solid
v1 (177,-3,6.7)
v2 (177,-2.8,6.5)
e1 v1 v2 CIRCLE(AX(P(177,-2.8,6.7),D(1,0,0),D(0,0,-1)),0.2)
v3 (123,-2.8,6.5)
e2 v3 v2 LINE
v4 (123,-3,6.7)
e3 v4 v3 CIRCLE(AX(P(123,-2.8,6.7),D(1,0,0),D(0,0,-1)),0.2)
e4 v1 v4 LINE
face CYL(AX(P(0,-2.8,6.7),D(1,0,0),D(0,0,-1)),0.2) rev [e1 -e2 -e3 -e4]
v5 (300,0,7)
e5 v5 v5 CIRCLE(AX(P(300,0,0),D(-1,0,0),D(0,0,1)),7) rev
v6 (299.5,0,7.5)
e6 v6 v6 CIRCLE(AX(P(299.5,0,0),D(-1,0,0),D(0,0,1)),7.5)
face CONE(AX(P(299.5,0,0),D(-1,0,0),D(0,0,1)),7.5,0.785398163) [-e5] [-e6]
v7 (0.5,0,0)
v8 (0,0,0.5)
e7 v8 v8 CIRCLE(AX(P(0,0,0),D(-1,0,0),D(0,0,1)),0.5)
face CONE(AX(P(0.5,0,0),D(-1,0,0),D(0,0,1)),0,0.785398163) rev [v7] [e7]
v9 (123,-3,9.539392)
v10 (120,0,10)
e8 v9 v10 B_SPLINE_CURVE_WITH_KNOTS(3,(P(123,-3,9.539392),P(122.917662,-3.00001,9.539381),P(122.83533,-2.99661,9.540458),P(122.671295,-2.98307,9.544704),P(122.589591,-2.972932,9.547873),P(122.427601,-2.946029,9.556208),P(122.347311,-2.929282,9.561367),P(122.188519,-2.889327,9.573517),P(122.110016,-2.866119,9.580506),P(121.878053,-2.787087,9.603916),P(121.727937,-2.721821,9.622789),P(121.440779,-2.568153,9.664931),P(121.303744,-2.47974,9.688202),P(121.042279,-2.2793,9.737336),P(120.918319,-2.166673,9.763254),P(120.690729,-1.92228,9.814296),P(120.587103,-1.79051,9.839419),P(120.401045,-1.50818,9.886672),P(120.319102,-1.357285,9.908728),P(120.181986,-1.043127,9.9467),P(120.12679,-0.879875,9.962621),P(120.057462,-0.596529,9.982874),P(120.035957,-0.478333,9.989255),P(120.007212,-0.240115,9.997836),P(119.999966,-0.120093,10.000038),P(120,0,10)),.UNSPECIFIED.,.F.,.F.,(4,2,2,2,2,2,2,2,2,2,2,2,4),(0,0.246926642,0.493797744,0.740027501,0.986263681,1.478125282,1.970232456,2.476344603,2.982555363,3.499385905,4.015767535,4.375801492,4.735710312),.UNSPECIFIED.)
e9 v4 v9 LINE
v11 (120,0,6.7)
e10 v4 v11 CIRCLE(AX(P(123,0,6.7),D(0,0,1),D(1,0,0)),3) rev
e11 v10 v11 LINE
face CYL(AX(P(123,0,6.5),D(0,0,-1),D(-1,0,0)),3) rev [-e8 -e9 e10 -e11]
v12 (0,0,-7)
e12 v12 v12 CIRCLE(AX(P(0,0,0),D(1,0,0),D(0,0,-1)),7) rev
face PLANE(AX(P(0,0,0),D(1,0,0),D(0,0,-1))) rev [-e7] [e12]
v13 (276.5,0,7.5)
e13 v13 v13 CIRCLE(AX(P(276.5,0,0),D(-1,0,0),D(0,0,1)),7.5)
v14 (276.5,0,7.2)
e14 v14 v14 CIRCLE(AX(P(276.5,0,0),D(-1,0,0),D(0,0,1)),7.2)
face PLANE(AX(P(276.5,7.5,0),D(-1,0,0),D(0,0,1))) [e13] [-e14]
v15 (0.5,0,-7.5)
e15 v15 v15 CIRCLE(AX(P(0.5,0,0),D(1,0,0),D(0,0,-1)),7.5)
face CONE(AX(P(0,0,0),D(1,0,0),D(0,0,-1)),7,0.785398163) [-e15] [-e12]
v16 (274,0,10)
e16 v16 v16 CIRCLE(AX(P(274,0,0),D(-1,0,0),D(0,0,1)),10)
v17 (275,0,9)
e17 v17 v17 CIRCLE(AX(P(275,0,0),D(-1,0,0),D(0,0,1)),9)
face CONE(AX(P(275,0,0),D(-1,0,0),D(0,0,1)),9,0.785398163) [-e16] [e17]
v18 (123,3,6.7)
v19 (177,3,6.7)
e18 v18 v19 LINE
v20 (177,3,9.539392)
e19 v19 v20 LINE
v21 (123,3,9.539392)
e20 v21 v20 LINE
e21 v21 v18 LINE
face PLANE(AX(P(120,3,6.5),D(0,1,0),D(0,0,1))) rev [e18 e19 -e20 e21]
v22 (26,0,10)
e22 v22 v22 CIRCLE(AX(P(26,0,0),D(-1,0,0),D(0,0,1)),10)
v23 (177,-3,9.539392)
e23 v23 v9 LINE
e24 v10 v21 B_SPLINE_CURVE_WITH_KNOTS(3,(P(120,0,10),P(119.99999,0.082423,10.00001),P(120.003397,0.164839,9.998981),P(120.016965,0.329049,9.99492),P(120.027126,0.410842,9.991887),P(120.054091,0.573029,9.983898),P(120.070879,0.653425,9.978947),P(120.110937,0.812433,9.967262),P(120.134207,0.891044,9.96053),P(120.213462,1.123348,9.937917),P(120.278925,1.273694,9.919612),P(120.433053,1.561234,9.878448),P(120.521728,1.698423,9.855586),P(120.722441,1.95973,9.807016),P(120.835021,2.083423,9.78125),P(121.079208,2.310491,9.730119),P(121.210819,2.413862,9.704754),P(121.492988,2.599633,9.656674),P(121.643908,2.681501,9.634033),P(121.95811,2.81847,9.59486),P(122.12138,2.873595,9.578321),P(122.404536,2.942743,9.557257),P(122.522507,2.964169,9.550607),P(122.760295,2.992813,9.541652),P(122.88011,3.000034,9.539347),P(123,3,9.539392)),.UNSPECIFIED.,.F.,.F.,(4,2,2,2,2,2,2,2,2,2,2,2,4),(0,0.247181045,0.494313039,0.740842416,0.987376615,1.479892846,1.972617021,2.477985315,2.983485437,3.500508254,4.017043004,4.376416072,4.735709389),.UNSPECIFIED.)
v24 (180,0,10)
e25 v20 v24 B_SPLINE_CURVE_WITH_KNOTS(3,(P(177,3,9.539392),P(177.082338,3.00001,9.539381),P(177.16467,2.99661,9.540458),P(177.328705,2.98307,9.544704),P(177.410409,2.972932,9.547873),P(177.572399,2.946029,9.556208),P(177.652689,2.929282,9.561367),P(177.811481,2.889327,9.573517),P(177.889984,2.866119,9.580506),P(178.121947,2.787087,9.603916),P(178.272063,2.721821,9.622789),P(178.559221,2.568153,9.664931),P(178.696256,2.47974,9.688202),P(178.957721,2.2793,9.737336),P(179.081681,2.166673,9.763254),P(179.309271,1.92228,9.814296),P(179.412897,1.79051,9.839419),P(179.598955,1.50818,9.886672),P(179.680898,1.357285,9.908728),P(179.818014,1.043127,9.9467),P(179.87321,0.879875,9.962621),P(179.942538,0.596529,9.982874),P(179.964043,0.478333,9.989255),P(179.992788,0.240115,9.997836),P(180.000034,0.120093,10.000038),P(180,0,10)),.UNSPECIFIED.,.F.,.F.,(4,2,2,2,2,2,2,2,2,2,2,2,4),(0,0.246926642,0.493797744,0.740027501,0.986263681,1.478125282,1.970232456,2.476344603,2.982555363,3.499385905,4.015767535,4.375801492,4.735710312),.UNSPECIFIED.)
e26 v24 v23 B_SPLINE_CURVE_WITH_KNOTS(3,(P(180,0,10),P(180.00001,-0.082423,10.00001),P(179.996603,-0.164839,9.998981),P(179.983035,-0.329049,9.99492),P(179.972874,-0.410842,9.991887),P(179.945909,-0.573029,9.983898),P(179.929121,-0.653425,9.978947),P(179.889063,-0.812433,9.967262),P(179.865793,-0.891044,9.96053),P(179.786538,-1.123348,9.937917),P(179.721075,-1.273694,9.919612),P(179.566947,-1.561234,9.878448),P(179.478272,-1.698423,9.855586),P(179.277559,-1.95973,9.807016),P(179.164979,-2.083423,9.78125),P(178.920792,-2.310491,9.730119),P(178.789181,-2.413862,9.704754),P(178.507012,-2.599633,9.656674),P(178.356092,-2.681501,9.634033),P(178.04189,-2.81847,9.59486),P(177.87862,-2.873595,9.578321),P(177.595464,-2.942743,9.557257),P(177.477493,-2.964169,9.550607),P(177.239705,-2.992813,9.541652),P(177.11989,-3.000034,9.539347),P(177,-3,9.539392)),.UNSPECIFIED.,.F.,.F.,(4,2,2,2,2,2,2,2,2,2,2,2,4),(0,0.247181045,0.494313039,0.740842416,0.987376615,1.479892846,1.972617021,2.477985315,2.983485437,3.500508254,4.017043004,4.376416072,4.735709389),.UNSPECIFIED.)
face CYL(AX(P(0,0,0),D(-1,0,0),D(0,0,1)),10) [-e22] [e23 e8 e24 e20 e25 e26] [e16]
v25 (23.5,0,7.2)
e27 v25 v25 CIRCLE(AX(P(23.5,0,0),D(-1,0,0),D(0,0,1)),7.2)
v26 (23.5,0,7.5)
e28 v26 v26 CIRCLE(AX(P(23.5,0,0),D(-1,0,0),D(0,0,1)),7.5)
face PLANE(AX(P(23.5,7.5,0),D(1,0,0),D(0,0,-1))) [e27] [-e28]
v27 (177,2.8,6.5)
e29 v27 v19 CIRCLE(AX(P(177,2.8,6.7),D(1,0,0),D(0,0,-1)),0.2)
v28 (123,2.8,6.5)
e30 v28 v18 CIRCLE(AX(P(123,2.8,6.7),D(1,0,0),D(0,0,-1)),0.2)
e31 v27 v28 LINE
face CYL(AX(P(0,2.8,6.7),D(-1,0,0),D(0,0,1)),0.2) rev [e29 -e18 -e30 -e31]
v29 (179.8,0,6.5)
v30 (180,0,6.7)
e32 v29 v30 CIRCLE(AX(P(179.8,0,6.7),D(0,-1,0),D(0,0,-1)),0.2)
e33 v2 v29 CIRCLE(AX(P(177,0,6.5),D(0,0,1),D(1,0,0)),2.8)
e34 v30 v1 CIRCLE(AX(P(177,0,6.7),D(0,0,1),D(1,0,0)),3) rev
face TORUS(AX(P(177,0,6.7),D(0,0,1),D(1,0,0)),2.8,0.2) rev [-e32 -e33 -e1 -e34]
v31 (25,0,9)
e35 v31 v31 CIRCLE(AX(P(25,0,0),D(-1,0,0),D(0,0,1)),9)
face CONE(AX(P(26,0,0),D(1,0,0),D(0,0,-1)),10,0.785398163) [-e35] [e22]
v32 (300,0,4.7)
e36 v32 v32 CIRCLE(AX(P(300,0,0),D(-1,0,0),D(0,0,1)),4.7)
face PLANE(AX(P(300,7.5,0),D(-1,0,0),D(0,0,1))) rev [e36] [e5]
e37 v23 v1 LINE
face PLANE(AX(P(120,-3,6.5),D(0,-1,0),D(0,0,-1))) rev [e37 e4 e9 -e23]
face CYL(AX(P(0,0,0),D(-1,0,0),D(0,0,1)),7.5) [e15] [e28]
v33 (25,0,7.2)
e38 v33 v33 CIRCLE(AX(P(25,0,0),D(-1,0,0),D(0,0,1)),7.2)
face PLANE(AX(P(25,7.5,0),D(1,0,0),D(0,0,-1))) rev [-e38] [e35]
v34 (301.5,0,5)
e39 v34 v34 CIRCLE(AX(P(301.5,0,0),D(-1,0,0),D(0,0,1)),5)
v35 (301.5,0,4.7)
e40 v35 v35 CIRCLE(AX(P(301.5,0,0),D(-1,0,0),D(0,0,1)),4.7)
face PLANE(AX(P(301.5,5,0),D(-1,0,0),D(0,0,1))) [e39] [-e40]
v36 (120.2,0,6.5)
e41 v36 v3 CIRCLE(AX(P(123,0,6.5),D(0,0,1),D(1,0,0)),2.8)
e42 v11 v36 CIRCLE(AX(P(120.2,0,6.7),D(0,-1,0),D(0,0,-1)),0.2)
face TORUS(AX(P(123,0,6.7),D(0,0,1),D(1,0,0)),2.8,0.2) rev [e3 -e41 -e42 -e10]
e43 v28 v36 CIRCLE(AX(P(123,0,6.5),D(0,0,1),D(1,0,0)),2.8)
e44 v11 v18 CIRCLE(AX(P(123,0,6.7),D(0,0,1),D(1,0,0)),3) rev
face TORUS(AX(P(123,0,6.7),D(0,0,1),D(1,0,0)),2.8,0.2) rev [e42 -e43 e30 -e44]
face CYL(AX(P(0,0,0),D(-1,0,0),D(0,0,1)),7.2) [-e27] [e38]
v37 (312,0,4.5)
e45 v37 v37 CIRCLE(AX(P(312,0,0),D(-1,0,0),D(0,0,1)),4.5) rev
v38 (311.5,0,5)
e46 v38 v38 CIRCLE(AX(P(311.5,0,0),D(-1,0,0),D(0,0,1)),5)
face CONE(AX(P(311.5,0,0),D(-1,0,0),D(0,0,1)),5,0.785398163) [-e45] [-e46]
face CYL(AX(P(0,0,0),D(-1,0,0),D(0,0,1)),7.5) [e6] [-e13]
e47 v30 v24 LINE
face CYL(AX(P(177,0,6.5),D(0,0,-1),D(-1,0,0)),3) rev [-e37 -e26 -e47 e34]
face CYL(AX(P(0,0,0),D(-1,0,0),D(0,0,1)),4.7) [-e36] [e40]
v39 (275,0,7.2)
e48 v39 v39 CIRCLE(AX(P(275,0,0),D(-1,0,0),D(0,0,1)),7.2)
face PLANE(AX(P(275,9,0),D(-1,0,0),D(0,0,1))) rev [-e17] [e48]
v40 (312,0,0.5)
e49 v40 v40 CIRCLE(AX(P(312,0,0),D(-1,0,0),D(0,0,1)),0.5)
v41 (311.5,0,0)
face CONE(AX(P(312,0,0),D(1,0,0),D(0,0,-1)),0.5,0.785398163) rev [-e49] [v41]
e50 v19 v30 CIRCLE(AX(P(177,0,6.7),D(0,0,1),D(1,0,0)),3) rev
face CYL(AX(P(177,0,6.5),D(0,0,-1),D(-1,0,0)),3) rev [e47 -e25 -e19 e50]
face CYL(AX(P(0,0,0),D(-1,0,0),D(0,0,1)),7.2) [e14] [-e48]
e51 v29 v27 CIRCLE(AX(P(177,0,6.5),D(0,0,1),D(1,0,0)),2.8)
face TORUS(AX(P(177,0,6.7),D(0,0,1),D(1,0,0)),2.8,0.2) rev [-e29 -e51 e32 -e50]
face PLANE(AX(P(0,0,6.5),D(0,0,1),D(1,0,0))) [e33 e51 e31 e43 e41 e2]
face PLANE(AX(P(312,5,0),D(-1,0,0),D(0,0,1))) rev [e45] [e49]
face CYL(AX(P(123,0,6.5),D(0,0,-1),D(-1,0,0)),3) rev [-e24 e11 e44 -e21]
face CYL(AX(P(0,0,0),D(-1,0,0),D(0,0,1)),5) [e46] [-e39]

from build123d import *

# Parameters (mm, degrees)
CHAMFER1_SIZE      = 0.5
SKETCH3_W          = 1.5
SKETCH3_H          = 0.3
SKETCH9_W          = 60
SKETCH9_H          = 6
CUT_EXTRUDE2_DEPTH = 3.5
FILLET4_R          = 3
FILLET5_R          = 3
FILLET6_R          = 0.2


with BuildPart() as part:
    # Sketch1 → Revolve1 (revolve)
    with BuildSketch(Plane.XY, mode=Mode.PRIVATE) as revolve1_sk:
        Polygon((0, 0), (0, 7.5), (25, 7.5), (25, 9), (26, 10), (274, 10), (275, 9), (275, 7.5), (300, 7.5), (300, 5), (312, 5), (312, 0), align=None)
    revolve(revolve1_sk.sketch.rotate(Axis((0, 0, 0), (1, 0, 0)), 90), axis=Axis((0, 0, 0), (1, 0, 0)))

    # Chamfer1
    chamfer1_edges = [part.edges().sort_by_distance(p)[0] for p in [
        (300, 0, -7.5),
        (312, 0, -5),
        (0, 0, -7.5),
    ]]
    chamfer(chamfer1_edges, length=CHAMFER1_SIZE)

    # Sketch2 → Cut-Revolve1 (revolve, cut)
    with BuildSketch(Plane.XY, mode=Mode.PRIVATE) as cut_revolve1_sk:
        Polygon((0, 0), (0, 0.5), (0.5, 0), align=None)
        Polygon((312, 0), (312, 0.5), (311.5, 0), align=None)
    revolve(cut_revolve1_sk.sketch.rotate(Axis((0, 0, 0), (1, 0, 0)), 270), axis=Axis((0, 0, 0), (1, 0, 0)), mode=Mode.SUBTRACT)

    # Sketch3 → Cut-Revolve2 (revolve, cut)
    with BuildSketch(Plane.XY, mode=Mode.PRIVATE) as cut_revolve2_sk:
        with Locations((24.25, 7.35)):
            Rectangle(SKETCH3_W, SKETCH3_H)
        with Locations((275.75, 7.35)):
            Rectangle(SKETCH3_W, SKETCH3_H)
        with Locations((300.75, 4.85)):
            Rectangle(SKETCH3_W, SKETCH3_H)
    revolve(cut_revolve2_sk.sketch.rotate(Axis((0, 0, 0), (1, 0, 0)), 90), axis=Axis((0, 0, 0), (1, 0, 0)), mode=Mode.SUBTRACT)

    # Sketch9 → Cut-Extrude2 (cut)
    with BuildSketch(Plane.XY.offset(10)):
        with Locations((150, 0)):
            Rectangle(SKETCH9_W, SKETCH9_H)
    extrude(amount=-CUT_EXTRUDE2_DEPTH, mode=Mode.SUBTRACT)

    # Fillet4
    fillet4_edges = [part.edges().sort_by_distance(p)[0] for p in [
        (120, 3, 8.019696007),
        (120, -3, 8.019696007),
    ]]
    fillet(fillet4_edges, radius=FILLET4_R - 0.0001)  # a hair under: the kernel refuses the full size

    # Fillet5
    fillet5_edges = [part.edges().sort_by_distance(p)[0] for p in [
        (180, 3, 8.019696007),
        (180, -3, 8.019696007),
    ]]
    fillet(fillet5_edges, radius=FILLET5_R - 0.0001)  # a hair under: the kernel refuses the full size

    # Fillet6
    fillet6_edges = [part.edges().sort_by_distance(p)[0] for p in [
        (150, -3, 6.5),
        (120.878650367, -2.121349633, 6.5),
        (120.878650367, 2.121349633, 6.5),
        (150, 3, 6.5),
        (179.121349633, -2.121349633, 6.5),
        (179.121349633, 2.121349633, 6.5),
    ]]
    fillet(fillet6_edges, radius=FILLET6_R)


solid = part.part
